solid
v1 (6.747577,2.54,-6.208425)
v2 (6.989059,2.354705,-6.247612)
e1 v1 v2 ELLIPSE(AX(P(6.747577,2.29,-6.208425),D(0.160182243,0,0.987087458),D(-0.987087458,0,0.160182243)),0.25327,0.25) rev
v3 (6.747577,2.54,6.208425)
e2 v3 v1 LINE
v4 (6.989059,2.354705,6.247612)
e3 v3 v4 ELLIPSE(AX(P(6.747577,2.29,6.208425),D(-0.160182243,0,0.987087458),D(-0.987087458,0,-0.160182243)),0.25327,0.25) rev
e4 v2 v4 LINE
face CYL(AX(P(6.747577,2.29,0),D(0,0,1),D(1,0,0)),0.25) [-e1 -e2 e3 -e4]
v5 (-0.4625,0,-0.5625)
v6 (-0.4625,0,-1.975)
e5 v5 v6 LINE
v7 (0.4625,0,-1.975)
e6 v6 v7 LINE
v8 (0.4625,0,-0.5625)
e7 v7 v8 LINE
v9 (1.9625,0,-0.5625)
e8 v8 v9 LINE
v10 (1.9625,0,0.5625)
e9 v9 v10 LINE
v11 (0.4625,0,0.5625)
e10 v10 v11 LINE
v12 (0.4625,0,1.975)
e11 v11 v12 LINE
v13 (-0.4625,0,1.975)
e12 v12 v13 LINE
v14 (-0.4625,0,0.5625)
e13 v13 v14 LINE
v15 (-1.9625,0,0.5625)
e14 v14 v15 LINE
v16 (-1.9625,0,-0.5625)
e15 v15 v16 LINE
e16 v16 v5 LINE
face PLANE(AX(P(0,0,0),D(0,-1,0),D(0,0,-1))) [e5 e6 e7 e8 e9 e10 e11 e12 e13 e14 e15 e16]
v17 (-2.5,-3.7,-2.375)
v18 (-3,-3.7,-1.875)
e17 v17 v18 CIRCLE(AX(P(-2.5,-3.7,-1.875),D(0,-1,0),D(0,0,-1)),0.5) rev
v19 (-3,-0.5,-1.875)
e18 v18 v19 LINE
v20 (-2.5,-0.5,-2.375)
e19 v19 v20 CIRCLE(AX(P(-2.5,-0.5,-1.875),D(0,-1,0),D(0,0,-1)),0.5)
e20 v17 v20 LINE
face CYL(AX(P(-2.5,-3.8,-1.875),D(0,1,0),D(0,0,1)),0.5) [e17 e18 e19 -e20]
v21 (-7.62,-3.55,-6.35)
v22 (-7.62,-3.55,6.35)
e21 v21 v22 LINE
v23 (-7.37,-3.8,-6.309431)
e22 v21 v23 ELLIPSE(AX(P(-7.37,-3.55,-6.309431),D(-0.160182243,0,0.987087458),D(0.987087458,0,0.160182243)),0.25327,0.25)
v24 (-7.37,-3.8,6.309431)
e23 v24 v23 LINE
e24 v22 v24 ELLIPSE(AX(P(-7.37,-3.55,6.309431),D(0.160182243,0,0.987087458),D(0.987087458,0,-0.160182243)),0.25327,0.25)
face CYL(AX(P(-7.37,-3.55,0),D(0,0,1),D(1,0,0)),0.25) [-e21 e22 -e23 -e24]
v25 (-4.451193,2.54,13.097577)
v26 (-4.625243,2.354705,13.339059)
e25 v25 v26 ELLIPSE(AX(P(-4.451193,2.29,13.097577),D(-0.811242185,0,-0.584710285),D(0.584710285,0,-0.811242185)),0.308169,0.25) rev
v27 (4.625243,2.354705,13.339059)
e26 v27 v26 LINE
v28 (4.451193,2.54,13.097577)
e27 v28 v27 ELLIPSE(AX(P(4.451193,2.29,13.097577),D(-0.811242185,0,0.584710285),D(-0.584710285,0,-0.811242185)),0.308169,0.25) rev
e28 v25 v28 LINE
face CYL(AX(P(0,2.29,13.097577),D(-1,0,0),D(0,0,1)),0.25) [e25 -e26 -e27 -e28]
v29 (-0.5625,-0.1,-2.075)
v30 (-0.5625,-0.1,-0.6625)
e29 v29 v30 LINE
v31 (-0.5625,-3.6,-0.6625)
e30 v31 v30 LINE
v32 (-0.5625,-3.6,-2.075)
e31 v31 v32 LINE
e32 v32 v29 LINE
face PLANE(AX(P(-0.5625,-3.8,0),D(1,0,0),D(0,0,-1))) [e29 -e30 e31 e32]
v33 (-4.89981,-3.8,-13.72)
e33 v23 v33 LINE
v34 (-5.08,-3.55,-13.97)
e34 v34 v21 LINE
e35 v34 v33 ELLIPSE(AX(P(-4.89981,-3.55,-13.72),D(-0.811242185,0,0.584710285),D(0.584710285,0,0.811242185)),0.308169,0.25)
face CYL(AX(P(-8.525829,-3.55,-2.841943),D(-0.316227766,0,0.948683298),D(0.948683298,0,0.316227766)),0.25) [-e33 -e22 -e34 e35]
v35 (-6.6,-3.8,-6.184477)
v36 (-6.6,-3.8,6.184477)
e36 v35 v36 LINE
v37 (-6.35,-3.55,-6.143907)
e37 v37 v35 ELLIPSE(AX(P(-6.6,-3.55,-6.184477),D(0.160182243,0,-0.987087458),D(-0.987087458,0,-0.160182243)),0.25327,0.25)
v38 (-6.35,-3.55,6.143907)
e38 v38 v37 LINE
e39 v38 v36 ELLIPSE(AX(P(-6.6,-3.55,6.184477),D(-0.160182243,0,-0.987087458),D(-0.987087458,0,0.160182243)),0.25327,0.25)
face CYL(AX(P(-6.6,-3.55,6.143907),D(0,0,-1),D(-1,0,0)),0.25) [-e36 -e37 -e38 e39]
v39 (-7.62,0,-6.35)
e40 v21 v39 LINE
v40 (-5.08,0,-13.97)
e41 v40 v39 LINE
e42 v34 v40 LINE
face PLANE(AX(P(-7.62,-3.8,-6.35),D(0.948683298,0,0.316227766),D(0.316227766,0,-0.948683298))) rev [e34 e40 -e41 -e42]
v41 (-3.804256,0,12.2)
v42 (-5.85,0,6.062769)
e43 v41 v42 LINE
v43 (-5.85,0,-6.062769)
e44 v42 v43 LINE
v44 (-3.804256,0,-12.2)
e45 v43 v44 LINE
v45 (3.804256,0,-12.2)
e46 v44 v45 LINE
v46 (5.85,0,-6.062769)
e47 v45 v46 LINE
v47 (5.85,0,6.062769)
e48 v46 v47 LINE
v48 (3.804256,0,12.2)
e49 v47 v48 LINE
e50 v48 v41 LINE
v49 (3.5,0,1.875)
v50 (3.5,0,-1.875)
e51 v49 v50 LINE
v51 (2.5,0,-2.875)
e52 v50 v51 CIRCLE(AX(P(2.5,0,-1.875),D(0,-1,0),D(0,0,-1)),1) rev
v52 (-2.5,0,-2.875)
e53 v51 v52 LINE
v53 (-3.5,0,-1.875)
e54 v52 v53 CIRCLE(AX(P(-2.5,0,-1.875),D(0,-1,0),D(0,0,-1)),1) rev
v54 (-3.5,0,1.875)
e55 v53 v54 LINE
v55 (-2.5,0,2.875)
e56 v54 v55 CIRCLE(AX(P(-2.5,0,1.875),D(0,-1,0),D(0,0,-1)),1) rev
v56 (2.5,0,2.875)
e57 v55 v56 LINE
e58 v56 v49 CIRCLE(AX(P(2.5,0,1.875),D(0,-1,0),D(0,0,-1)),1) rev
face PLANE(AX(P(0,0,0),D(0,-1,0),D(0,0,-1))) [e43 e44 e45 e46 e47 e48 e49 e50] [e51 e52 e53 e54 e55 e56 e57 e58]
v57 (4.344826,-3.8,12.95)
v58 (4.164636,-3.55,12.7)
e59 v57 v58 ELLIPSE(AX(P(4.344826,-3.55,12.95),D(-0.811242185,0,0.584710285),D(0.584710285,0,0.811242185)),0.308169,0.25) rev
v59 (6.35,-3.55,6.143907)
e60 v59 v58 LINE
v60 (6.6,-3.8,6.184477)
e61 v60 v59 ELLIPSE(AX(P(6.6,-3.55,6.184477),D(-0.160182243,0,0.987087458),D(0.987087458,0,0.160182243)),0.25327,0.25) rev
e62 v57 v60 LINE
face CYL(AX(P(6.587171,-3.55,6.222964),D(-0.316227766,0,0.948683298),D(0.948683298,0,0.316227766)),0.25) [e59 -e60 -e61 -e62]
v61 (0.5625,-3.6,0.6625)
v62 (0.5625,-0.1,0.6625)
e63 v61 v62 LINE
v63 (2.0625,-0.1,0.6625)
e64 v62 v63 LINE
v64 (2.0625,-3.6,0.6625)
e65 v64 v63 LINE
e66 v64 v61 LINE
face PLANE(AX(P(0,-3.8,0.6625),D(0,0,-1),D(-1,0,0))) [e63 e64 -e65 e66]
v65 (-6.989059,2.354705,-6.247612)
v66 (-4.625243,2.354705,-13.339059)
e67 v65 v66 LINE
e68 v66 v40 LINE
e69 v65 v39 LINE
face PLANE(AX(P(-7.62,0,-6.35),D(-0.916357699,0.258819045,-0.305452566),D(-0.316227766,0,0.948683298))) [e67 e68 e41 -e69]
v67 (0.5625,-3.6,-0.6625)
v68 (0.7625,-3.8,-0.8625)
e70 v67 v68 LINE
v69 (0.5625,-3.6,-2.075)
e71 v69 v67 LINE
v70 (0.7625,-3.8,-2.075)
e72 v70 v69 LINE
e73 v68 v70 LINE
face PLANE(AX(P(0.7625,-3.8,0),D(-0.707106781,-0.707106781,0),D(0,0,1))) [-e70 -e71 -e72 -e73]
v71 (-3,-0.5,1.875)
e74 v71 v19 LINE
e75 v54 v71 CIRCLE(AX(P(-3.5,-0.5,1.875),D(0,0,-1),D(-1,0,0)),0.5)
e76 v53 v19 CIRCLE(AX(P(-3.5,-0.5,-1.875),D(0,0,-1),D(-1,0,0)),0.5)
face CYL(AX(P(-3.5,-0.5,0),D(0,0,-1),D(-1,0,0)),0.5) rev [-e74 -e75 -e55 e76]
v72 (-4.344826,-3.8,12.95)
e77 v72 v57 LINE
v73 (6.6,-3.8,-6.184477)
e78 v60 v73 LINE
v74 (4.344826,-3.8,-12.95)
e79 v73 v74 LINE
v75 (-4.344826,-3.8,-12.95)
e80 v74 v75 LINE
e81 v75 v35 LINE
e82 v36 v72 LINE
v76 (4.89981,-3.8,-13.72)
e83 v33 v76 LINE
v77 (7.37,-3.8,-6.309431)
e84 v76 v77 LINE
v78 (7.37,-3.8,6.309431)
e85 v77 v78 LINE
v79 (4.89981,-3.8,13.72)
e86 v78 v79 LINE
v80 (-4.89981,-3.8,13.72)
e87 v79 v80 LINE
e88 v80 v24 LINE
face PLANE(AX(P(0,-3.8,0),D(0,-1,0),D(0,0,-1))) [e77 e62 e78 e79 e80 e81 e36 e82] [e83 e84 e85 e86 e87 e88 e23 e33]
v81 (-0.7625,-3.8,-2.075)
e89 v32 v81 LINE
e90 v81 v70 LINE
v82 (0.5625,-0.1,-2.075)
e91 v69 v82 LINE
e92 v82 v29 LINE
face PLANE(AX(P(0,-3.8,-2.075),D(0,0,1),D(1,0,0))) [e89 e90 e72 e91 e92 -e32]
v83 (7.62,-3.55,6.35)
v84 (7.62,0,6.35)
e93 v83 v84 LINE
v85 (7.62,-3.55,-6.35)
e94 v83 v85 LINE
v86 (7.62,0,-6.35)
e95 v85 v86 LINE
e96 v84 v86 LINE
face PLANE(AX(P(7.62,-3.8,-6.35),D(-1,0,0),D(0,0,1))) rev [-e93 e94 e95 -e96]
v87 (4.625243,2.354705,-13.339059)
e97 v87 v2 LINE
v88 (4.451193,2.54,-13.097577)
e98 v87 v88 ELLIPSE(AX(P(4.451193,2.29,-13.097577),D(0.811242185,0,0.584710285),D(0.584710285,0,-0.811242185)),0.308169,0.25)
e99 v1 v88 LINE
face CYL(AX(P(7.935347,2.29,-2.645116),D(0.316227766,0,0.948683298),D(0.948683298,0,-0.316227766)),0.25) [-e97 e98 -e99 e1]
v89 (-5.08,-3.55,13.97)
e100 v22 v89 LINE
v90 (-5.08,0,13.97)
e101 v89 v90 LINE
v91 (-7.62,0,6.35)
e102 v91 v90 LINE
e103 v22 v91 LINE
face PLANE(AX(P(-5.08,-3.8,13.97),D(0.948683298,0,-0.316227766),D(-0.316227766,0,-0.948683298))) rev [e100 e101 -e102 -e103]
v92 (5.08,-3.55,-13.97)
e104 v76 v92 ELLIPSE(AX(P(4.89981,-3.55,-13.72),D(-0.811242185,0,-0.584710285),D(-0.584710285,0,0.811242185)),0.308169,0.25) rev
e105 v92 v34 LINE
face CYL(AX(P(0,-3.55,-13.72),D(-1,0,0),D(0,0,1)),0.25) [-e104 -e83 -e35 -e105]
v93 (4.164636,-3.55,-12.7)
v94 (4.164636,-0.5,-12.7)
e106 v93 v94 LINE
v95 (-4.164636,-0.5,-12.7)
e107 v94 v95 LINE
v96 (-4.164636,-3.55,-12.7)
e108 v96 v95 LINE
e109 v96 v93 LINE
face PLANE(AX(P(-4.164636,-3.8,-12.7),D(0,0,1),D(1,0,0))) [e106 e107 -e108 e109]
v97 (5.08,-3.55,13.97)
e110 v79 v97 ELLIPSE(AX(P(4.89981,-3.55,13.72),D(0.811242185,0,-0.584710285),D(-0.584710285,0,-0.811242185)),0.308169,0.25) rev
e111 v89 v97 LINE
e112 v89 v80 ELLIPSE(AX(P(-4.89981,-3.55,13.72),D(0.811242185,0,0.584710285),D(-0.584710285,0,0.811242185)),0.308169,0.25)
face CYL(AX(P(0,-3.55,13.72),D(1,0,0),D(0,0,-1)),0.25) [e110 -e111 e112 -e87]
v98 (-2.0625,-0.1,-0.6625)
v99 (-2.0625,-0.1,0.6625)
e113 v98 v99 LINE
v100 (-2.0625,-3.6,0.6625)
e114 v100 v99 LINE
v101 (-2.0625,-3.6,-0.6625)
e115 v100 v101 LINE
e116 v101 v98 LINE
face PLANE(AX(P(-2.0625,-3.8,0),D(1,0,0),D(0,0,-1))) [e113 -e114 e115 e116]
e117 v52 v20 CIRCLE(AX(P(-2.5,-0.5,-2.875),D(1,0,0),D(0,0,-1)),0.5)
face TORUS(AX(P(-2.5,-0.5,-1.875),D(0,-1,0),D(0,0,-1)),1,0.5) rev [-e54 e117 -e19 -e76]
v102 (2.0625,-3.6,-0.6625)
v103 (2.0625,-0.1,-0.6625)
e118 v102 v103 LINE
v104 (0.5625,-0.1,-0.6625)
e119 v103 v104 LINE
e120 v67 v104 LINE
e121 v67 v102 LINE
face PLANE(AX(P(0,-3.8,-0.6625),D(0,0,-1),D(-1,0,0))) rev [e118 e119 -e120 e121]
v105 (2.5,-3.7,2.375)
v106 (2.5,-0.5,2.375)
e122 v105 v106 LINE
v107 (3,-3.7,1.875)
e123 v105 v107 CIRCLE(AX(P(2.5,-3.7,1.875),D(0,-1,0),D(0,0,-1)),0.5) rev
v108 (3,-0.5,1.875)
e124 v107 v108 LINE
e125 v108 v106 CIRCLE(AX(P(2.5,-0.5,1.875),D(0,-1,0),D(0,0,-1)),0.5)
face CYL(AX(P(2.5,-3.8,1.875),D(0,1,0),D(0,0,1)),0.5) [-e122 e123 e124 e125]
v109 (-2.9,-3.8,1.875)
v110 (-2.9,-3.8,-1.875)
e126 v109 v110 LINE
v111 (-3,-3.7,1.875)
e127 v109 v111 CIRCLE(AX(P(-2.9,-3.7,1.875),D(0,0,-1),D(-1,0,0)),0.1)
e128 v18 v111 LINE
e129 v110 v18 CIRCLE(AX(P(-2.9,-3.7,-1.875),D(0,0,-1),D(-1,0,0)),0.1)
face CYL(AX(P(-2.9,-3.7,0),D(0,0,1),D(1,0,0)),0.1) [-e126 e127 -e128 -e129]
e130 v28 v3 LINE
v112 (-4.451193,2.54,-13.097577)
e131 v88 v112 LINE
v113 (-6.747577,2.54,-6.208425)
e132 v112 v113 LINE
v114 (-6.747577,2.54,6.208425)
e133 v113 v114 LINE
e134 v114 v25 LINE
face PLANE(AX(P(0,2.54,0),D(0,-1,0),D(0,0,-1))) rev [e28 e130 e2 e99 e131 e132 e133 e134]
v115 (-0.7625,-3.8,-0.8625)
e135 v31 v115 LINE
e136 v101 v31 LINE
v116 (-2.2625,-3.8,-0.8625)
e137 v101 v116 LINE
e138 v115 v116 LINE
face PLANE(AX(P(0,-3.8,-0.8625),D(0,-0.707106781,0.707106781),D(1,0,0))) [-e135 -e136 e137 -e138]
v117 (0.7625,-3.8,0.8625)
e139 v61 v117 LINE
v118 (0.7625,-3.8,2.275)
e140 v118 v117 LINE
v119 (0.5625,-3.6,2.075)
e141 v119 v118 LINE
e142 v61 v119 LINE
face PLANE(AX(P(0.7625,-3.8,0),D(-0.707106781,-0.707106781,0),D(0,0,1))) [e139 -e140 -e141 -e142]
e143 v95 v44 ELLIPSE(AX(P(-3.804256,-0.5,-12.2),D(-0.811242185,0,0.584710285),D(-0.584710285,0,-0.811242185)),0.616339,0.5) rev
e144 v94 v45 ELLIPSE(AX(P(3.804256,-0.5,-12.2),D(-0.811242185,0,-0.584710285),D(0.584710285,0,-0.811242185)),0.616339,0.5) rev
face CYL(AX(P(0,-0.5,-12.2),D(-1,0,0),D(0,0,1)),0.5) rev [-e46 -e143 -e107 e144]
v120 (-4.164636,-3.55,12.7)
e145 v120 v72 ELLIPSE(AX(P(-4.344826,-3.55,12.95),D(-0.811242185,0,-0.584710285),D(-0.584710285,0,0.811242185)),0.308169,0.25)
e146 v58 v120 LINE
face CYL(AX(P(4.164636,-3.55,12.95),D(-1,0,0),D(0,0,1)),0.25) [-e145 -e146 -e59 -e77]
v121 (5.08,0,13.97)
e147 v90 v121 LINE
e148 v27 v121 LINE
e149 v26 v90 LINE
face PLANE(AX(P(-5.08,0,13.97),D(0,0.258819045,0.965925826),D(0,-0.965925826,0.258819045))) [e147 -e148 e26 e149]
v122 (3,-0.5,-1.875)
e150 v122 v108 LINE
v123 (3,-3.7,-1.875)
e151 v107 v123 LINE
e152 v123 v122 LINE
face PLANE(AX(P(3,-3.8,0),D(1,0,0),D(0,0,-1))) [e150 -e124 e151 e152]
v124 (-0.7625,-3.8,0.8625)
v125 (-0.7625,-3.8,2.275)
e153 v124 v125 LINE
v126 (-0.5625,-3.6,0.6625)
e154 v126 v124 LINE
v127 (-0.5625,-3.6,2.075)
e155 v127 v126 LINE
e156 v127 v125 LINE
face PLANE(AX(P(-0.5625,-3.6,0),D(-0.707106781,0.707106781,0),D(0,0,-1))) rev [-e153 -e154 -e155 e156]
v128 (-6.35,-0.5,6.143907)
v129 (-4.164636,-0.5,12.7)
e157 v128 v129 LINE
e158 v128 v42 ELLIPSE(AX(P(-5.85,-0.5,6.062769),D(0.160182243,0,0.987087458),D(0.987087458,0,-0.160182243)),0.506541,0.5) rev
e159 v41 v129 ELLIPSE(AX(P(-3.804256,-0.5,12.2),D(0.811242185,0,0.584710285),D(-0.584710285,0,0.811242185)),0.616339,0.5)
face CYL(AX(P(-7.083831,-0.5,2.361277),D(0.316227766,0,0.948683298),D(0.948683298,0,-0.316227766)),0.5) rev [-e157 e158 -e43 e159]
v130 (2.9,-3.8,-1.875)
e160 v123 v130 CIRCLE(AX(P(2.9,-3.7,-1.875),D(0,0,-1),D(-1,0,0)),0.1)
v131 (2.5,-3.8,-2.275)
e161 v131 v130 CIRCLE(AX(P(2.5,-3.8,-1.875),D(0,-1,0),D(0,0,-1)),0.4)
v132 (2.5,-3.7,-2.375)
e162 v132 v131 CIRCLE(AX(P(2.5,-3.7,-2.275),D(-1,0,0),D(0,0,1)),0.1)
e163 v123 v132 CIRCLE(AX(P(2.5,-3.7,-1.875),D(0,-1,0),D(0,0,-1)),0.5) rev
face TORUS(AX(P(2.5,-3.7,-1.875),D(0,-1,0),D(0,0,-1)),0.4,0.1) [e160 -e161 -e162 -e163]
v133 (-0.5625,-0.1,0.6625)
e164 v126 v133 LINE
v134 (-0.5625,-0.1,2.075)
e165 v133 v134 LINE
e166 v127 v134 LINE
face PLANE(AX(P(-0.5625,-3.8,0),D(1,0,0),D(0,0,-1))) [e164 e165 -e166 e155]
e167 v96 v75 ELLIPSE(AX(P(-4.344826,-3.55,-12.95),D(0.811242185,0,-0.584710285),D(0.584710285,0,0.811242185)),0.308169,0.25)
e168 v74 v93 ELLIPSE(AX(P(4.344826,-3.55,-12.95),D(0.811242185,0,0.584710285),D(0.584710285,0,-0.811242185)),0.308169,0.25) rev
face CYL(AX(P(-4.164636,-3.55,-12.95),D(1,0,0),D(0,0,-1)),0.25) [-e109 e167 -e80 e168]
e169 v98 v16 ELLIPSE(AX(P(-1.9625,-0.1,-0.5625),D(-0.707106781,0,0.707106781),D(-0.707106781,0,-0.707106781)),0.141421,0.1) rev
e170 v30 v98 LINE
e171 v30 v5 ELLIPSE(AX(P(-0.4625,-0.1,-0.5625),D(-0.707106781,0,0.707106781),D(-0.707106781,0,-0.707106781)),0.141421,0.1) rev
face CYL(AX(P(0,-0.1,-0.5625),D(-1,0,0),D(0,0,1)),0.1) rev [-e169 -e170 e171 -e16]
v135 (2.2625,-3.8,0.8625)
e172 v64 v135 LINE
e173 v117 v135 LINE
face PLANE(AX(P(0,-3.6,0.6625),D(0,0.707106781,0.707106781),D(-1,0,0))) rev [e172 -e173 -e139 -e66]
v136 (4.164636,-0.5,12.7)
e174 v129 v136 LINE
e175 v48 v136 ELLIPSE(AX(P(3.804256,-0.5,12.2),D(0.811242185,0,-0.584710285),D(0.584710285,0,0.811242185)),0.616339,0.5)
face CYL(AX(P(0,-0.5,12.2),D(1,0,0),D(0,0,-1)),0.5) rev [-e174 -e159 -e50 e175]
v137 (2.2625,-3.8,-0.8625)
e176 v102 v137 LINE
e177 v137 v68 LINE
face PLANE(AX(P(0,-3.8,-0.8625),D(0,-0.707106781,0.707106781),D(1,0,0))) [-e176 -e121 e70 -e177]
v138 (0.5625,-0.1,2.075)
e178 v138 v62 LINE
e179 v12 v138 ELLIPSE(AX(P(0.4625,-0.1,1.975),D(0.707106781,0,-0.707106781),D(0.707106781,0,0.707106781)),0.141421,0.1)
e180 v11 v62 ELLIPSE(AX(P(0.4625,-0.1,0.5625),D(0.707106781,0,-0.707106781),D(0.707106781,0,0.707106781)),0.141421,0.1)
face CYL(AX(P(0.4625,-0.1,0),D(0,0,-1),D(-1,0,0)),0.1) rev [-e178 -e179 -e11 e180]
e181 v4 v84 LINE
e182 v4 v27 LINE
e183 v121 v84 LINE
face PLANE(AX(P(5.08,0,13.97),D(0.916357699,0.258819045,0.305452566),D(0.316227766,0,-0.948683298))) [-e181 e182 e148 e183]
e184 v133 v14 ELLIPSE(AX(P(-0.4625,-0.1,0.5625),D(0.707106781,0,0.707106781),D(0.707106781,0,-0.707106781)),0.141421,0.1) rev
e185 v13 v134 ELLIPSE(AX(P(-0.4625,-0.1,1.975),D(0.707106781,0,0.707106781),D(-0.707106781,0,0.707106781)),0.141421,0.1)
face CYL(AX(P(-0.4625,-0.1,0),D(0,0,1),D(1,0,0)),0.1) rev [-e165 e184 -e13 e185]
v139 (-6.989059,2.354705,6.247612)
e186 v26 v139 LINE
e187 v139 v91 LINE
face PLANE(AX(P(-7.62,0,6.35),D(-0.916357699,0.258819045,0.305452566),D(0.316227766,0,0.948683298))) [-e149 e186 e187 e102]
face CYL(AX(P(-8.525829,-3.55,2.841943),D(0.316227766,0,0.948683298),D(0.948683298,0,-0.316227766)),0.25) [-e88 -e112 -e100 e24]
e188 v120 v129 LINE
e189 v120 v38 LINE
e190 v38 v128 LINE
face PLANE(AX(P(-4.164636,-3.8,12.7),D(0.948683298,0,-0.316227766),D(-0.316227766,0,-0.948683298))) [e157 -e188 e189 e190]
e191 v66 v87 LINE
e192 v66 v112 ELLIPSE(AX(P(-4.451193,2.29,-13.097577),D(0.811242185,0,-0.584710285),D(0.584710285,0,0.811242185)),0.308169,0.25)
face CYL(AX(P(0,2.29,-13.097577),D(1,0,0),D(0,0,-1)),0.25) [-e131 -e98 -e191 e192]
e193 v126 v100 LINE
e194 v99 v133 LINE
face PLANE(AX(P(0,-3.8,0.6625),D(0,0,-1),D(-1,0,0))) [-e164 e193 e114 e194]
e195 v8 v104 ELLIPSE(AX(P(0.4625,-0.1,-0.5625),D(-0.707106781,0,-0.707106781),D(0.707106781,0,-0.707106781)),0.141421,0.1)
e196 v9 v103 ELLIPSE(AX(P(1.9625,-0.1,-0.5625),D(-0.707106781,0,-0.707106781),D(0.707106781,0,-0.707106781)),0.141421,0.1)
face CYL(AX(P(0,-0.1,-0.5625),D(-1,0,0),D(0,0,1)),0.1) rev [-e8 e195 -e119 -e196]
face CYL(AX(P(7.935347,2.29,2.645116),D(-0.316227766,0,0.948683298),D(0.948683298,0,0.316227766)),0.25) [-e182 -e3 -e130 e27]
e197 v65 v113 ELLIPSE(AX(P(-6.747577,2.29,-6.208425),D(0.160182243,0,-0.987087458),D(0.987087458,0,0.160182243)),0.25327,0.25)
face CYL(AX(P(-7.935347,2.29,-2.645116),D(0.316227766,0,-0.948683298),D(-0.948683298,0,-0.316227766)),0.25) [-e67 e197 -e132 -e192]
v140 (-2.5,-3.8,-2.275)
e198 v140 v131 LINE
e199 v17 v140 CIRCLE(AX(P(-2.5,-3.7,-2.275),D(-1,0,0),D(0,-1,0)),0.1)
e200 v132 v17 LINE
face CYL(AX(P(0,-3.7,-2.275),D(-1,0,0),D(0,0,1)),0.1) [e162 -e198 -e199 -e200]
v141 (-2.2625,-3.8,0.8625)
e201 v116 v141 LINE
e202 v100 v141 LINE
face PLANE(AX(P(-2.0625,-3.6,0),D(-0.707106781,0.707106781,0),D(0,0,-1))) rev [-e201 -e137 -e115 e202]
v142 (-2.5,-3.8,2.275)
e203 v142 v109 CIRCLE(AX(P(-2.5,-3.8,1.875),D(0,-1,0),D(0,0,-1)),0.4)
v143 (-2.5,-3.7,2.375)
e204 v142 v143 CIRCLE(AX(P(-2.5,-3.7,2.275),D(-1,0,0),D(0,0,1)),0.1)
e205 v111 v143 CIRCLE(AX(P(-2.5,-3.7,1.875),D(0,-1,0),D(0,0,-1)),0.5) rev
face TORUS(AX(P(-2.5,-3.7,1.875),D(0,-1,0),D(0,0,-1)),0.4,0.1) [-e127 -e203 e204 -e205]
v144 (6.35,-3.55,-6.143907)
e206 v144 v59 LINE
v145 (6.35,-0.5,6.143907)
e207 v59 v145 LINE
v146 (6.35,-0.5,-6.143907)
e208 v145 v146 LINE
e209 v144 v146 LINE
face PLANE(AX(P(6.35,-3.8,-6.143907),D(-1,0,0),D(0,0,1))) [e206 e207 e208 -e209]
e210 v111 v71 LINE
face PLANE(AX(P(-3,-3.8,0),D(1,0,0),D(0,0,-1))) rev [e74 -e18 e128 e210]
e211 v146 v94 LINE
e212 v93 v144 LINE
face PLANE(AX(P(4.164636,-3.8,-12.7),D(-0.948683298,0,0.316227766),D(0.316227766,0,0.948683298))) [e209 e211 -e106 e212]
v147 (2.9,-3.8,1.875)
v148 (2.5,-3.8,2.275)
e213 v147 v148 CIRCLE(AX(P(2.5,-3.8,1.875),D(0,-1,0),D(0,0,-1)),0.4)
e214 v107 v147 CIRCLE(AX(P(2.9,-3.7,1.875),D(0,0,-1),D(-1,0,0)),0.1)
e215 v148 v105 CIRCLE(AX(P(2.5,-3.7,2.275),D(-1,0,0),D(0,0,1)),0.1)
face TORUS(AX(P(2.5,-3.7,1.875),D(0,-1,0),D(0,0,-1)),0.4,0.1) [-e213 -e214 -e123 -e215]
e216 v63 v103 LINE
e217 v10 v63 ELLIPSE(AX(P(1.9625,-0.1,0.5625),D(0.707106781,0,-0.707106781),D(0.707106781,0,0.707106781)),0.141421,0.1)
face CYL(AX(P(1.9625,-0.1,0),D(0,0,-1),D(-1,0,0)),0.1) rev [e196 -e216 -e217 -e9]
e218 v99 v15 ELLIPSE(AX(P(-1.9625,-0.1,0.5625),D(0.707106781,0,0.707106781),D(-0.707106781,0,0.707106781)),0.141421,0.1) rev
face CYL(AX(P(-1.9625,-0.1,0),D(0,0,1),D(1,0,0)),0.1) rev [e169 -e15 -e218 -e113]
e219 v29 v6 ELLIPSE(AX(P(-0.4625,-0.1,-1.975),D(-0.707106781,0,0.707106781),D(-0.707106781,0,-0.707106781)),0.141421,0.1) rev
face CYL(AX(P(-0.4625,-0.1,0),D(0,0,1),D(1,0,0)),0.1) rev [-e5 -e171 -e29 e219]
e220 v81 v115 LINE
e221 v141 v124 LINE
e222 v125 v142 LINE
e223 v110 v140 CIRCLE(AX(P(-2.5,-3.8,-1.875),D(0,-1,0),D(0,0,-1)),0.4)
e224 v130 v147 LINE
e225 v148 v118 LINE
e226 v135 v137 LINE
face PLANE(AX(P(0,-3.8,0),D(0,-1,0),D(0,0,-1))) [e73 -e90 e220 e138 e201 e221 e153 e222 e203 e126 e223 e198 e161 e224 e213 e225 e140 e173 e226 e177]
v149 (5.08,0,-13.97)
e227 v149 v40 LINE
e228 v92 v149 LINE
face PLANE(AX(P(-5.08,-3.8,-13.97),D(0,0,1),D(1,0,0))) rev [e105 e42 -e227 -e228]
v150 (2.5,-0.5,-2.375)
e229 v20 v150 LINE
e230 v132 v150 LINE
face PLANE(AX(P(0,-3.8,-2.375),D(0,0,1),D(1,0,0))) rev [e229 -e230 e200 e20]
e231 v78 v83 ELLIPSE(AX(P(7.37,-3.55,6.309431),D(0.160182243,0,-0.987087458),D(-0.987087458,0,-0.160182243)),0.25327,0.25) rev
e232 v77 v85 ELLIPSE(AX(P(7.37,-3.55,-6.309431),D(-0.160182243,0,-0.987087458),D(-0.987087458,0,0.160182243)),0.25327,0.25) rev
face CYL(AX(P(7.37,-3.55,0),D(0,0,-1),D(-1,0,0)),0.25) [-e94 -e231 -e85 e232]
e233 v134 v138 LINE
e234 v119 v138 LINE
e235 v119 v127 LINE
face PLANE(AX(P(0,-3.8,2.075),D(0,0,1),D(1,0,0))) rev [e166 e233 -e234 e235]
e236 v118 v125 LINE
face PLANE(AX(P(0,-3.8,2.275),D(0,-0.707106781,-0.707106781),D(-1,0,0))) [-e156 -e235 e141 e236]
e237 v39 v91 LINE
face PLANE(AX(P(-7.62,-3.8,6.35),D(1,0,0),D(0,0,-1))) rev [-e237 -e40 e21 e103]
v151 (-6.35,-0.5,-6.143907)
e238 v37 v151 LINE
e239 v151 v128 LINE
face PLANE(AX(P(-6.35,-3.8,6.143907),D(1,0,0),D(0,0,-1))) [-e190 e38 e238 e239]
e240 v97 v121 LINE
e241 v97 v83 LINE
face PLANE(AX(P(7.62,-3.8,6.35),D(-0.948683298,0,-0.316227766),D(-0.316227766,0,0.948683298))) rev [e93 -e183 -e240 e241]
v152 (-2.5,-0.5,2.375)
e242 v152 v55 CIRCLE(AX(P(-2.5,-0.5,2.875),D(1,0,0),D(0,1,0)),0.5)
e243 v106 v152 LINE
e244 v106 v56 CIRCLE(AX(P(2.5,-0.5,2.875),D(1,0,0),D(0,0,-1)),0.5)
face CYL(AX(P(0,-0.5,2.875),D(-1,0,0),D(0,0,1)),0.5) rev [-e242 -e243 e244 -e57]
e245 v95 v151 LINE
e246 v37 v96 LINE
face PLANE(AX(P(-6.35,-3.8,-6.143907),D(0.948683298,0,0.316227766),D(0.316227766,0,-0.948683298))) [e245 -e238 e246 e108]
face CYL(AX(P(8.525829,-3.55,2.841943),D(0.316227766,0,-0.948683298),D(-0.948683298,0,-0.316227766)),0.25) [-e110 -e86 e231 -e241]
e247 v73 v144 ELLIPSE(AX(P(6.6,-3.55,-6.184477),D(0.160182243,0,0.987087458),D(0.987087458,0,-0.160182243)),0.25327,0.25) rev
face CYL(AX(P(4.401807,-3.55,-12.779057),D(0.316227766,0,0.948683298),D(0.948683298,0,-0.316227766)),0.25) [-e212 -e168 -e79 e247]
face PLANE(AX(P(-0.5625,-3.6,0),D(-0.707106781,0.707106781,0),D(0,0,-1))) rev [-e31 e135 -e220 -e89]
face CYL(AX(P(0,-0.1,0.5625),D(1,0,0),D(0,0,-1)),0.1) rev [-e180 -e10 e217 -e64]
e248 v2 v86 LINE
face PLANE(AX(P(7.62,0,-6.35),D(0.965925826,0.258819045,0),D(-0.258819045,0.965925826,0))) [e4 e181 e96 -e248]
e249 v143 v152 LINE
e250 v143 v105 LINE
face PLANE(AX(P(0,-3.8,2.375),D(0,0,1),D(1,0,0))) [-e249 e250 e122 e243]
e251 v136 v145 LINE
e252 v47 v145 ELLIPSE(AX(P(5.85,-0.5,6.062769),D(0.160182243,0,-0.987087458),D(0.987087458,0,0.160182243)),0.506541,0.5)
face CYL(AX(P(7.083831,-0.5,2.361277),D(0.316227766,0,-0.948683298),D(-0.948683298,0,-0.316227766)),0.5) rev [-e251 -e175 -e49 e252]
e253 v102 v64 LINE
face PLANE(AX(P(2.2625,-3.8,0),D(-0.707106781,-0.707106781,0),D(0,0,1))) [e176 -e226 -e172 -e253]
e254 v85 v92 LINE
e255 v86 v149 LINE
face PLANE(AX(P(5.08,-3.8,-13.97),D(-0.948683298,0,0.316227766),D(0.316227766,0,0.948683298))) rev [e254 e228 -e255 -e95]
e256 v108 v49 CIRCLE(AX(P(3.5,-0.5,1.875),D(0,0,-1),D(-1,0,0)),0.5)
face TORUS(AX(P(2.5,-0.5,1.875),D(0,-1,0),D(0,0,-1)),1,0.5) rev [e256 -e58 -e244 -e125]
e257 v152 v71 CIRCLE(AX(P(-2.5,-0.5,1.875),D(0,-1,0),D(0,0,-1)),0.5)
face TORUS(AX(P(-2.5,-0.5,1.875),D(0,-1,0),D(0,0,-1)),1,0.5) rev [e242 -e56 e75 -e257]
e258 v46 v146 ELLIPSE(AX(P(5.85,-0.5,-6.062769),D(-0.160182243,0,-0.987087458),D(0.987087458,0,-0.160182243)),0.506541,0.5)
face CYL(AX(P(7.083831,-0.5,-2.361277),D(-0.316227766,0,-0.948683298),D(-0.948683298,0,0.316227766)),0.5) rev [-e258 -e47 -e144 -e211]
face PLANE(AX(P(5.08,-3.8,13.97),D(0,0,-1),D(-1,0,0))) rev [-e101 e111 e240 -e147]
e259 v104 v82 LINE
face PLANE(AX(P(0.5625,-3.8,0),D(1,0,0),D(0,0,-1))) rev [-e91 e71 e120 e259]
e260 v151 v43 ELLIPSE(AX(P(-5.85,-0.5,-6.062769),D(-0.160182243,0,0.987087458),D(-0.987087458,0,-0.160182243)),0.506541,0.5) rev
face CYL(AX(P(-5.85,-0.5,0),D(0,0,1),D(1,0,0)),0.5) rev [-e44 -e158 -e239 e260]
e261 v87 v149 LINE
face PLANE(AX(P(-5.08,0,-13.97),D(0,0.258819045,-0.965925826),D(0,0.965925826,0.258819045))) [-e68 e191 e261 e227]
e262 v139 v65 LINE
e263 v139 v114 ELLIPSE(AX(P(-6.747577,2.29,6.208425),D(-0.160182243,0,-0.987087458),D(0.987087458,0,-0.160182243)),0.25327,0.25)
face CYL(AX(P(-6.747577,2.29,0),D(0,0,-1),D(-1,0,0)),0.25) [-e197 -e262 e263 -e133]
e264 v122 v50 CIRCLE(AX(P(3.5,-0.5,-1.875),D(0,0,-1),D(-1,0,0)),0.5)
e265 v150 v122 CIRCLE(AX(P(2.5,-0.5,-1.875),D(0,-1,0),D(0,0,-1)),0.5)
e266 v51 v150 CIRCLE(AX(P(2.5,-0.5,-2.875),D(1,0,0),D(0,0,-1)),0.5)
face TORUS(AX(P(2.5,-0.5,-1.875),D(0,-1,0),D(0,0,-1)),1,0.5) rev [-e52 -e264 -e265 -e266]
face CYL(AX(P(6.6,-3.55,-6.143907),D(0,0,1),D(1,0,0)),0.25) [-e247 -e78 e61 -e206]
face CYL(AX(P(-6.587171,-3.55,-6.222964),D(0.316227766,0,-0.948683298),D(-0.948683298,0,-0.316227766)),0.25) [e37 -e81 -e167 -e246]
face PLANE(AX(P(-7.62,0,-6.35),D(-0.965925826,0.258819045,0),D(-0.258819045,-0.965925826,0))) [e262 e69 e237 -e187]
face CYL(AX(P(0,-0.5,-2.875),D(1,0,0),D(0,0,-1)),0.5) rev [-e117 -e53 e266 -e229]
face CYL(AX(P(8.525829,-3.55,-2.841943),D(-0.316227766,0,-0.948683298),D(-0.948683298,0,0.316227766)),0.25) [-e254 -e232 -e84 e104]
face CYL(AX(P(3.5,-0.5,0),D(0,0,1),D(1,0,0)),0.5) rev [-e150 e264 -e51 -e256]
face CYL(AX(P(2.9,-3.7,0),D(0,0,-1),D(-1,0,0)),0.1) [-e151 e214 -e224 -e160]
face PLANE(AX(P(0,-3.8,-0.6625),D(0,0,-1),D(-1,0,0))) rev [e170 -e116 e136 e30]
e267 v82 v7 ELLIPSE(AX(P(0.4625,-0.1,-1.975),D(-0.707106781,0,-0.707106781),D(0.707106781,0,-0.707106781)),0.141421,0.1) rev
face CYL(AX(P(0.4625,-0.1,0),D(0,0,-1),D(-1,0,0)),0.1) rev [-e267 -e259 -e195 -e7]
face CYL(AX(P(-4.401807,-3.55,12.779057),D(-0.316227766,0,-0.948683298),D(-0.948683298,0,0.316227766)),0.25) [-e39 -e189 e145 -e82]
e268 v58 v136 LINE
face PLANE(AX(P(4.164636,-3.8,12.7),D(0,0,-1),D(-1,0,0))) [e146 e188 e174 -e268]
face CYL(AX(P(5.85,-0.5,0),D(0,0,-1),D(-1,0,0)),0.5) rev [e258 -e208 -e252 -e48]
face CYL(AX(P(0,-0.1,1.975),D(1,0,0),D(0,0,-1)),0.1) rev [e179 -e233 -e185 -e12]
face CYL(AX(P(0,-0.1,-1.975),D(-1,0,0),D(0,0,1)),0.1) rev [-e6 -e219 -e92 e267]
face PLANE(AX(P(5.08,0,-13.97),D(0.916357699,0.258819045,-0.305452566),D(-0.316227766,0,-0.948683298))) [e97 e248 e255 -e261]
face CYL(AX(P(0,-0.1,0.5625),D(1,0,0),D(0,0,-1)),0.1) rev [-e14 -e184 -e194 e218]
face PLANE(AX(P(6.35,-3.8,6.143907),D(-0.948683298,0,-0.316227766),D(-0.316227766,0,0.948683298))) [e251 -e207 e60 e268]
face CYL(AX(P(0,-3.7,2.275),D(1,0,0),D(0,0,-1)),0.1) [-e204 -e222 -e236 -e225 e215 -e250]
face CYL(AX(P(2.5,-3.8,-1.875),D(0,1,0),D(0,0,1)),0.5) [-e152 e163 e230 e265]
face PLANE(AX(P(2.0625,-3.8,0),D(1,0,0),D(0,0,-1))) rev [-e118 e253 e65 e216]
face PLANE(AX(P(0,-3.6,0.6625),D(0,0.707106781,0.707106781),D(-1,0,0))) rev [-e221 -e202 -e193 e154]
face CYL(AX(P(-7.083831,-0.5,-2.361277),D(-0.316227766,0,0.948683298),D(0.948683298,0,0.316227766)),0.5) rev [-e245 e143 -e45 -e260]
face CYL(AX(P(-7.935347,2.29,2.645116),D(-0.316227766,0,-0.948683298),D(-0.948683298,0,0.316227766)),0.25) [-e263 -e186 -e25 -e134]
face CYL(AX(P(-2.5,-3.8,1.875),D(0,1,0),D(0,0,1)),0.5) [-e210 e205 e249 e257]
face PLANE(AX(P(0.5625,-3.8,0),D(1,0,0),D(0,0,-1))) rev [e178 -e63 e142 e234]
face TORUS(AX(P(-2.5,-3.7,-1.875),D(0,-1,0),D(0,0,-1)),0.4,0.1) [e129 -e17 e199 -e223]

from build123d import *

# Parameters (mm, degrees)
BOSS_EXTRUDE1_DEPTH = 2.54
BOSS_EXTRUDE1_TAPER = 15
BOSS_EXTRUDE2_DEPTH = 3.8
FILLET2_R           = 0.1
CHAMFER1_SIZE       = 0.2
BOSS_EXTRUDE3_DEPTH = 3.8
FILLET3_R           = 0.25
FILLET5_R           = 0.5
FILLET6_R           = 0.1
FILLET7_R           = 0.25


with BuildPart() as part:
    # Sketch1 → Boss-Extrude1 (new body)
    with BuildSketch(Plane(origin=(0, 0, 0), x_dir=(1, 0, 0), z_dir=(0, 1, 0))):
        Polygon((-7.62, 6.35), (-7.62, -6.35), (-5.08, -13.97), (5.08, -13.97), (7.62, -6.35), (7.62, 6.35), (5.08, 13.97), (-5.08, 13.97), align=None)
    extrude(amount=BOSS_EXTRUDE1_DEPTH, taper=BOSS_EXTRUDE1_TAPER)

    # Stem → Boss-Extrude2 (add)
    with BuildSketch(Plane.XZ):
        with BuildLine():
            Line((2.499999969, 2.374999949), (-2.499999969, 2.374999949))
            ThreePointArc((-2.499999969, 2.374999949), (-2.85355336, 2.22855334), (-2.999999969, 1.874999949))
            Line((-2.999999969, 1.874999949), (-2.999999969, -1.874999949))
            ThreePointArc((-2.999999969, -1.874999949), (-2.85355336, -2.22855334), (-2.499999969, -2.374999949))
            Line((-2.499999969, -2.374999949), (2.499999969, -2.374999949))
            ThreePointArc((2.499999969, -2.374999949), (2.85355336, -2.22855334), (2.999999969, -1.874999949))
            Line((2.999999969, -1.874999949), (2.999999969, 1.874999949))
            ThreePointArc((2.999999969, 1.874999949), (2.85355336, 2.22855334), (2.499999969, 2.374999949))
        make_face()
        Polygon((-0.5625, 0.6625), (-0.5625, 2.075), (0.5625, 2.075), (0.5625, 0.6625), (2.0625, 0.6625), (2.0625, -0.6625), (0.5625, -0.6625), (0.5625, -2.075), (-0.5625, -2.075), (-0.5625, -0.6625), (-2.0625, -0.6625), (-2.0625, 0.6625), align=None, mode=Mode.SUBTRACT)
    extrude(amount=BOSS_EXTRUDE2_DEPTH)

    # Fillet2
    fillet2_edges = [part.edges().sort_by_distance(p)[0] for p in [
        (2.85355336, -3.8, 2.22855334),
        (0, -3.8, 2.374999949),
        (2.999999969, -3.8, 0),
        (-2.85355336, -3.8, 2.22855334),
        (-2.999999969, -3.8, 0),
        (-2.85355336, -3.8, -2.22855334),
        (0, -3.8, -2.374999949),
        (2.85355336, -3.8, -2.22855334),
    ]]
    fillet(fillet2_edges, radius=FILLET2_R)

    # Chamfer1
    chamfer1_edges = [part.edges().sort_by_distance(p)[0] for p in [
        (-2.0625, -3.8, 0),
        (-1.3125, -3.8, 0.6625),
        (-0.5625, -3.8, 1.36875),
        (1.3125, -3.8, 0.6625),
        (-0.5625, -3.8, -1.36875),
        (0, -3.8, 2.075),
        (0.5625, -3.8, 1.36875),
        (2.0625, -3.8, 0),
        (1.3125, -3.8, -0.6625),
        (0.5625, -3.8, -1.36875),
        (-1.3125, -3.8, -0.6625),
    ]]
    chamfer(chamfer1_edges, length=CHAMFER1_SIZE - 0.0001)  # a hair under: the kernel refuses the full size

    # Sketch3 → Boss-Extrude3 (add)
    with BuildSketch(Plane.XZ):
        Polygon((-7.62, 6.35), (-7.62, -6.35), (-5.08, -13.97), (5.08, -13.97), (7.62, -6.35), (7.62, 6.35), (5.08, 13.97), (-5.08, 13.97), align=None)
        Polygon((-6.35, -6.143907372), (-4.164635791, -12.7), (4.164635791, -12.7), (6.35, -6.143907372), (6.35, 6.143907372), (4.164635791, 12.7), (-4.164635791, 12.7), (-6.35, 6.143907372), align=None, mode=Mode.SUBTRACT)
    extrude(amount=BOSS_EXTRUDE3_DEPTH)

    # Fillet3
    fillet3_edges = [part.edges().sort_by_distance(p)[0] for p in [
        (-6.35, -3.8, 10.16),
        (-7.62, -3.8, 0),
        (-6.35, -3.8, -10.16),
        (0, -3.8, -13.97),
        (6.35, -3.8, -10.16),
        (7.62, -3.8, 0),
        (6.35, -3.8, 10.16),
        (0, -3.8, 13.97),
        (-6.35, -3.8, 0),
        (-5.257317895, -3.8, -9.421953686),
        (0, -3.8, -12.7),
        (5.257317895, -3.8, -9.421953686),
        (6.35, -3.8, 0),
        (5.257317895, -3.8, 9.421953686),
        (0, -3.8, 12.7),
        (-5.257317895, -3.8, 9.421953686),
    ]]
    fillet(fillet3_edges, radius=FILLET3_R)

    # Fillet5
    fillet5_edges = [part.edges().sort_by_distance(p)[0] for p in [
        (-6.35, 0, 0),
        (-5.257317895, 0, -9.421953686),
        (0, 0, -12.7),
        (5.257317895, 0, -9.421953686),
        (6.35, 0, 0),
        (5.257317895, 0, 9.421953686),
        (0, 0, 12.7),
        (-5.257317895, 0, 9.421953686),
        (-2.85355336, 0, 2.22855334),
        (-2.999999969, 0, 0),
        (-2.85355336, 0, -2.22855334),
        (0, 0, -2.374999949),
        (2.85355336, 0, -2.22855334),
        (2.85355336, 0, 2.22855334),
        (2.999999969, 0, 0),
        (0, 0, 2.374999949),
    ]]
    fillet(fillet5_edges, radius=FILLET5_R)

    # Fillet6
    fillet6_edges = [part.edges().sort_by_distance(p)[0] for p in [
        (0, 0, 2.075),
        (0.5625, 0, 1.36875),
        (2.0625, 0, 0),
        (1.3125, 0, -0.6625),
        (0.5625, 0, -1.36875),
        (-1.3125, 0, -0.6625),
        (-2.0625, 0, 0),
        (-0.5625, 0, -1.36875),
        (0, 0, -2.075),
        (1.3125, 0, 0.6625),
        (-0.5625, 0, 1.36875),
        (-1.3125, 0, 0.6625),
    ]]
    fillet(fillet6_edges, radius=FILLET6_R)

    # Fillet7
    fillet7_edges = [part.edges().sort_by_distance(p)[0] for p in [
        (-6.939409051, 2.54, 0),
        (-5.764433425, 2.54, 9.764482172),
        (0, 2.54, 13.289409051),
        (5.764433425, 2.54, 9.764482172),
        (6.939409051, 2.54, 0),
        (5.764433425, 2.54, -9.764482172),
        (0, 2.54, -13.289409051),
        (-5.764433425, 2.54, -9.764482172),
    ]]
    fillet(fillet7_edges, radius=FILLET7_R)


solid = part.part
